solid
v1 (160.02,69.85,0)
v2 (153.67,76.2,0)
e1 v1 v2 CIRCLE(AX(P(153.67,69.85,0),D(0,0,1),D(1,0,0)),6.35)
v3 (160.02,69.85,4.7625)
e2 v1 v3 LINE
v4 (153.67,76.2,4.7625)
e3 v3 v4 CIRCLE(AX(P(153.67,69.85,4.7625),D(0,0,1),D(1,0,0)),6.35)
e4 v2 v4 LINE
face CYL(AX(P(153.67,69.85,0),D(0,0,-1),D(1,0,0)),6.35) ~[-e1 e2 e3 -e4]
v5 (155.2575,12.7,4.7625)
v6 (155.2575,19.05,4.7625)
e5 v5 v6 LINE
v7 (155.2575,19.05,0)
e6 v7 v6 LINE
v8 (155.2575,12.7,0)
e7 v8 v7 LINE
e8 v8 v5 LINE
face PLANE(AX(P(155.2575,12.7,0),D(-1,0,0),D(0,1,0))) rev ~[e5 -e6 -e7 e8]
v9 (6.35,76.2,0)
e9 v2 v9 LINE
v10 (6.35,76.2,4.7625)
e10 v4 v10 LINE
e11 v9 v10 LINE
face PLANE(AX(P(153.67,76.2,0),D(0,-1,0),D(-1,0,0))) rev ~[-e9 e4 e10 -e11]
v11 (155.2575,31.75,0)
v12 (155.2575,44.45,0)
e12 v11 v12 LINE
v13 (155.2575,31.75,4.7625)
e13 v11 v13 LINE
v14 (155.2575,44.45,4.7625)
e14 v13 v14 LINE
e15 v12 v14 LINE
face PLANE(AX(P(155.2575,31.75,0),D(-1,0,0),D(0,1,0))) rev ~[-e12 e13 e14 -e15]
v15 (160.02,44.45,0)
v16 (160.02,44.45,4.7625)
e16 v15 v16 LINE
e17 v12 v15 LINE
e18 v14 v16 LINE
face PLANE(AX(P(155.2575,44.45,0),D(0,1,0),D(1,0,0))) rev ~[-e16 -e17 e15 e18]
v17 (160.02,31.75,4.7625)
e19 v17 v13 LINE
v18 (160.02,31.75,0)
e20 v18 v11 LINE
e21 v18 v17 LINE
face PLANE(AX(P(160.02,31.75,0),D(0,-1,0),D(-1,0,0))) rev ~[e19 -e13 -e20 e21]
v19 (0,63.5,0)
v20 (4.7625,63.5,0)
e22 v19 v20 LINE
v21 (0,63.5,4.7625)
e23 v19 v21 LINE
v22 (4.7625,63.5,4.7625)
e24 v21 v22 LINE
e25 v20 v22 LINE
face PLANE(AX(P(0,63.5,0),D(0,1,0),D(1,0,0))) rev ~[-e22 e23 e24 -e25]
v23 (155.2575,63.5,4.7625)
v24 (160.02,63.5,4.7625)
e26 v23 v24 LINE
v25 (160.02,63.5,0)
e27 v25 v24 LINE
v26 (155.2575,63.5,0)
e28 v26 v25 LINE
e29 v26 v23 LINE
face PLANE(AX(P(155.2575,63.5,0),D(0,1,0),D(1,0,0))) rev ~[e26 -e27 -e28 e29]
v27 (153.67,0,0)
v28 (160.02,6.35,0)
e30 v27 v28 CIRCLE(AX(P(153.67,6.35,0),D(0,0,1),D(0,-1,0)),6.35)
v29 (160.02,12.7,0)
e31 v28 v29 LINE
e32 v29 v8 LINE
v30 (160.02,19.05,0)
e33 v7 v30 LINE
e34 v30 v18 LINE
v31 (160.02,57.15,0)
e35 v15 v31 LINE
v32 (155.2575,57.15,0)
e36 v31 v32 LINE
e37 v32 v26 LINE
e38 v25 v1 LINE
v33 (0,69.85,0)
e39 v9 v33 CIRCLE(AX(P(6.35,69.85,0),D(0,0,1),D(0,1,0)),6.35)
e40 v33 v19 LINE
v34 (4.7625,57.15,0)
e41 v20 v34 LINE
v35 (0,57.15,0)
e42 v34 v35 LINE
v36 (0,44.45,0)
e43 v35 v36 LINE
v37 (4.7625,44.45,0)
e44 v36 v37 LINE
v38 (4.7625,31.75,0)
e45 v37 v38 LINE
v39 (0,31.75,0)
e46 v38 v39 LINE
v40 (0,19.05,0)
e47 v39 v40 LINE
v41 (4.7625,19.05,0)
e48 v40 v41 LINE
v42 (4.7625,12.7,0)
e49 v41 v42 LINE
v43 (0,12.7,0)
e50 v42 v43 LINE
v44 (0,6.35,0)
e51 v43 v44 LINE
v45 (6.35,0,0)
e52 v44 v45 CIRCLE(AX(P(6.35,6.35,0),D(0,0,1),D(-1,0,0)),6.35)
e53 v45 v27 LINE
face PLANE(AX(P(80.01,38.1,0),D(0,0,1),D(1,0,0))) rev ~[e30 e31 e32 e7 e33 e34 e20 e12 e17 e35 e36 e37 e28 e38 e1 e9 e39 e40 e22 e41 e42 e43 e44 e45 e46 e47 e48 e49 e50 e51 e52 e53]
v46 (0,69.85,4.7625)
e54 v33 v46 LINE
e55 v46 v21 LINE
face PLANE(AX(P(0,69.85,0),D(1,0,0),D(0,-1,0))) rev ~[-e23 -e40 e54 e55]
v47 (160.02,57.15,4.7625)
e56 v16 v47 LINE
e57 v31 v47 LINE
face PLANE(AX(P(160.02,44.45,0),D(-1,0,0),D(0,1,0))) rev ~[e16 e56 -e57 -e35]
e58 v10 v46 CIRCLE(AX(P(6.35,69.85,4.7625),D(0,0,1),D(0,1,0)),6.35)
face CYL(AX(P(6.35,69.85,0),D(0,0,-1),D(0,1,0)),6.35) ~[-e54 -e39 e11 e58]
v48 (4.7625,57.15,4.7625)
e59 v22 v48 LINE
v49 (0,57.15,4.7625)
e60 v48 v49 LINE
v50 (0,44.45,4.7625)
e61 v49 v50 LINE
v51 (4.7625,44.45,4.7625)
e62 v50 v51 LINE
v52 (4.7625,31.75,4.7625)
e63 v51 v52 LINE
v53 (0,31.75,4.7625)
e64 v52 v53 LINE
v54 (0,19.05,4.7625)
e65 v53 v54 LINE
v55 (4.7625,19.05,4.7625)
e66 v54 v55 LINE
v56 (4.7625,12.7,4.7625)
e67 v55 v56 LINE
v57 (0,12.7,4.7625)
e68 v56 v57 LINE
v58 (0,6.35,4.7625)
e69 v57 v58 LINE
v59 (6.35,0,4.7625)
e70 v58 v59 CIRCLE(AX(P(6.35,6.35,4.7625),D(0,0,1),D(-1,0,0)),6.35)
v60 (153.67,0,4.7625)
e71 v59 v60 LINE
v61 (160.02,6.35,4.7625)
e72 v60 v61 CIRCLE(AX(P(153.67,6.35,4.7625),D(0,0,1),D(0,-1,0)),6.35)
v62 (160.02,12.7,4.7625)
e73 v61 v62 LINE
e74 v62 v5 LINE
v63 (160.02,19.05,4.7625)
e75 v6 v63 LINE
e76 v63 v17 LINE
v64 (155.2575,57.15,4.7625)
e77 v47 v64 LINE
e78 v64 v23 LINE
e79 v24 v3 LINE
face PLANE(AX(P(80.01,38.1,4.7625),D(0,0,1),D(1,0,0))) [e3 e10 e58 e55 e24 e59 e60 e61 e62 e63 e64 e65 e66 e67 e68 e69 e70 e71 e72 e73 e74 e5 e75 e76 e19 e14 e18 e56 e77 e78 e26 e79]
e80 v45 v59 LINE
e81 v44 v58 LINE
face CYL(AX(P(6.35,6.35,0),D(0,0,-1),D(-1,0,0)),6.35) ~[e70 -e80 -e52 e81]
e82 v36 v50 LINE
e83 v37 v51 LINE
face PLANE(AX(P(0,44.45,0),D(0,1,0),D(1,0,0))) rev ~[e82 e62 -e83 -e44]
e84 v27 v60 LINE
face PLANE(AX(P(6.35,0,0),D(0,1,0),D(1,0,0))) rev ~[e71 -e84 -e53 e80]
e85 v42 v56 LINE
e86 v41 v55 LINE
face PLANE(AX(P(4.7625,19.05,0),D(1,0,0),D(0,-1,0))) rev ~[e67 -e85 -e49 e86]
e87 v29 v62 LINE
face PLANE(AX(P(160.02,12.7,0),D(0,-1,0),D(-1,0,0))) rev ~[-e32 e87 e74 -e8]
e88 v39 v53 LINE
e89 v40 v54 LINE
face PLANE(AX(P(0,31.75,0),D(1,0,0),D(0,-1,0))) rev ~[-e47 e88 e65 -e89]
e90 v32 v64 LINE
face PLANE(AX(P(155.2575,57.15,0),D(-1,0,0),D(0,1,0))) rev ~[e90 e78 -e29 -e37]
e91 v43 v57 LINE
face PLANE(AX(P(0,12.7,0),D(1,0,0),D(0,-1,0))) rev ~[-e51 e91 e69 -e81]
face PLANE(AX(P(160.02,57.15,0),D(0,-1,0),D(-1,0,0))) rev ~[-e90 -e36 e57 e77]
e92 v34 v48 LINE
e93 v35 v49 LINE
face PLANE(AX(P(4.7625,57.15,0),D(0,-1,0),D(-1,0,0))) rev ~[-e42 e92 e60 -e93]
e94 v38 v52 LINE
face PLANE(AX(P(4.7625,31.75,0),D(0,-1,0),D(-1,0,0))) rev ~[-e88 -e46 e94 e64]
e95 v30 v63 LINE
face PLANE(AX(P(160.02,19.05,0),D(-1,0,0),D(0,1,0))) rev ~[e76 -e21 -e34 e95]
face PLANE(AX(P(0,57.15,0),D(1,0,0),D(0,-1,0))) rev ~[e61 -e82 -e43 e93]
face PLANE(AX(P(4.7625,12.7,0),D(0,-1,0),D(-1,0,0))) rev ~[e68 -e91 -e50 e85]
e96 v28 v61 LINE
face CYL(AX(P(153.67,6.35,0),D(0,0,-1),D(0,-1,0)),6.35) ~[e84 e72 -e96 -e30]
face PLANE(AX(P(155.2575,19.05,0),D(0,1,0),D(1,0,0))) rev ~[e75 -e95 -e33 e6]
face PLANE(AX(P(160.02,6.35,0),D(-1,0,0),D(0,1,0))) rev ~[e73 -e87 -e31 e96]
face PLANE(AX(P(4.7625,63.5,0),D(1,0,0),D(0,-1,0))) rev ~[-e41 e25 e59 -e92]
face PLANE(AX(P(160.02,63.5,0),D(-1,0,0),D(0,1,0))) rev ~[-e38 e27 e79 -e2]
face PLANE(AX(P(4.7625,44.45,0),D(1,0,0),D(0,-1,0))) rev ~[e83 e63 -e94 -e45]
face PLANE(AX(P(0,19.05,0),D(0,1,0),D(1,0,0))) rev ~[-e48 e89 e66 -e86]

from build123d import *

# Parameters (mm, degrees)
F1_DEPTH = 4.7625


# Not quite as in the source:
# - a length typed as a fraction of an inch, garbled in the dataset ("3 / 203.2 mm" for 3/8 in), is restored
# - a feature names something its author has since deleted; it is built from what else it names


with BuildPart() as f1:
    # F0 (on Top) → F1 (new body)
    with BuildSketch(Plane.XY):
        with BuildLine():
            ThreePointArc((0, 6.35), (1.8598719395, 1.8598719395), (6.35, 0))
            Line((6.35, 0), (80.01, 0))
            Line((80.01, 0), (153.67, 0))
            ThreePointArc((153.67, 0), (158.1601280605, 1.8598719395), (160.02, 6.35))
            Line((160.02, 6.35), (160.02, 12.7))
            Line((160.02, 12.7), (155.2575, 12.7))
            Line((155.2575, 12.7), (155.2575, 19.05))
            Line((155.2575, 19.05), (160.02, 19.05))
            Line((160.02, 19.05), (160.02, 31.75))
            Line((160.02, 31.75), (155.2575, 31.75))
            Line((155.2575, 31.75), (155.2575, 44.45))
            Line((155.2575, 44.45), (160.02, 44.45))
            Line((160.02, 44.45), (160.02, 57.15))
            Line((160.02, 57.15), (155.2575, 57.15))
            Line((155.2575, 57.15), (155.2575, 63.5))
            Line((155.2575, 63.5), (160.02, 63.5))
            Line((160.02, 63.5), (160.02, 69.85))
            ThreePointArc((160.02, 69.85), (158.1601280605, 74.3401280605), (153.67, 76.2))
            Line((153.67, 76.2), (80.01, 76.2))
            Line((80.01, 76.2), (6.35, 76.2))
            ThreePointArc((6.35, 76.2), (1.8598719395, 74.3401280605), (0, 69.85))
            Line((0, 69.85), (0, 63.5))
            Line((0, 63.5), (4.7625, 63.5))
            Line((4.7625, 63.5), (4.7625, 57.15))
            Line((4.7625, 57.15), (0, 57.15))
            Line((0, 57.15), (0, 44.45))
            Line((0, 44.45), (4.7625, 44.45))
            Line((4.7625, 44.45), (4.7625, 31.75))
            Line((4.7625, 31.75), (0, 31.75))
            Line((0, 31.75), (0, 19.05))
            Line((0, 19.05), (4.7625, 19.05))
            Line((4.7625, 19.05), (4.7625, 12.7))
            Line((4.7625, 12.7), (0, 12.7))
            Line((0, 12.7), (0, 6.35))
        make_face()
    extrude(amount=F1_DEPTH)


solid = f1.part
